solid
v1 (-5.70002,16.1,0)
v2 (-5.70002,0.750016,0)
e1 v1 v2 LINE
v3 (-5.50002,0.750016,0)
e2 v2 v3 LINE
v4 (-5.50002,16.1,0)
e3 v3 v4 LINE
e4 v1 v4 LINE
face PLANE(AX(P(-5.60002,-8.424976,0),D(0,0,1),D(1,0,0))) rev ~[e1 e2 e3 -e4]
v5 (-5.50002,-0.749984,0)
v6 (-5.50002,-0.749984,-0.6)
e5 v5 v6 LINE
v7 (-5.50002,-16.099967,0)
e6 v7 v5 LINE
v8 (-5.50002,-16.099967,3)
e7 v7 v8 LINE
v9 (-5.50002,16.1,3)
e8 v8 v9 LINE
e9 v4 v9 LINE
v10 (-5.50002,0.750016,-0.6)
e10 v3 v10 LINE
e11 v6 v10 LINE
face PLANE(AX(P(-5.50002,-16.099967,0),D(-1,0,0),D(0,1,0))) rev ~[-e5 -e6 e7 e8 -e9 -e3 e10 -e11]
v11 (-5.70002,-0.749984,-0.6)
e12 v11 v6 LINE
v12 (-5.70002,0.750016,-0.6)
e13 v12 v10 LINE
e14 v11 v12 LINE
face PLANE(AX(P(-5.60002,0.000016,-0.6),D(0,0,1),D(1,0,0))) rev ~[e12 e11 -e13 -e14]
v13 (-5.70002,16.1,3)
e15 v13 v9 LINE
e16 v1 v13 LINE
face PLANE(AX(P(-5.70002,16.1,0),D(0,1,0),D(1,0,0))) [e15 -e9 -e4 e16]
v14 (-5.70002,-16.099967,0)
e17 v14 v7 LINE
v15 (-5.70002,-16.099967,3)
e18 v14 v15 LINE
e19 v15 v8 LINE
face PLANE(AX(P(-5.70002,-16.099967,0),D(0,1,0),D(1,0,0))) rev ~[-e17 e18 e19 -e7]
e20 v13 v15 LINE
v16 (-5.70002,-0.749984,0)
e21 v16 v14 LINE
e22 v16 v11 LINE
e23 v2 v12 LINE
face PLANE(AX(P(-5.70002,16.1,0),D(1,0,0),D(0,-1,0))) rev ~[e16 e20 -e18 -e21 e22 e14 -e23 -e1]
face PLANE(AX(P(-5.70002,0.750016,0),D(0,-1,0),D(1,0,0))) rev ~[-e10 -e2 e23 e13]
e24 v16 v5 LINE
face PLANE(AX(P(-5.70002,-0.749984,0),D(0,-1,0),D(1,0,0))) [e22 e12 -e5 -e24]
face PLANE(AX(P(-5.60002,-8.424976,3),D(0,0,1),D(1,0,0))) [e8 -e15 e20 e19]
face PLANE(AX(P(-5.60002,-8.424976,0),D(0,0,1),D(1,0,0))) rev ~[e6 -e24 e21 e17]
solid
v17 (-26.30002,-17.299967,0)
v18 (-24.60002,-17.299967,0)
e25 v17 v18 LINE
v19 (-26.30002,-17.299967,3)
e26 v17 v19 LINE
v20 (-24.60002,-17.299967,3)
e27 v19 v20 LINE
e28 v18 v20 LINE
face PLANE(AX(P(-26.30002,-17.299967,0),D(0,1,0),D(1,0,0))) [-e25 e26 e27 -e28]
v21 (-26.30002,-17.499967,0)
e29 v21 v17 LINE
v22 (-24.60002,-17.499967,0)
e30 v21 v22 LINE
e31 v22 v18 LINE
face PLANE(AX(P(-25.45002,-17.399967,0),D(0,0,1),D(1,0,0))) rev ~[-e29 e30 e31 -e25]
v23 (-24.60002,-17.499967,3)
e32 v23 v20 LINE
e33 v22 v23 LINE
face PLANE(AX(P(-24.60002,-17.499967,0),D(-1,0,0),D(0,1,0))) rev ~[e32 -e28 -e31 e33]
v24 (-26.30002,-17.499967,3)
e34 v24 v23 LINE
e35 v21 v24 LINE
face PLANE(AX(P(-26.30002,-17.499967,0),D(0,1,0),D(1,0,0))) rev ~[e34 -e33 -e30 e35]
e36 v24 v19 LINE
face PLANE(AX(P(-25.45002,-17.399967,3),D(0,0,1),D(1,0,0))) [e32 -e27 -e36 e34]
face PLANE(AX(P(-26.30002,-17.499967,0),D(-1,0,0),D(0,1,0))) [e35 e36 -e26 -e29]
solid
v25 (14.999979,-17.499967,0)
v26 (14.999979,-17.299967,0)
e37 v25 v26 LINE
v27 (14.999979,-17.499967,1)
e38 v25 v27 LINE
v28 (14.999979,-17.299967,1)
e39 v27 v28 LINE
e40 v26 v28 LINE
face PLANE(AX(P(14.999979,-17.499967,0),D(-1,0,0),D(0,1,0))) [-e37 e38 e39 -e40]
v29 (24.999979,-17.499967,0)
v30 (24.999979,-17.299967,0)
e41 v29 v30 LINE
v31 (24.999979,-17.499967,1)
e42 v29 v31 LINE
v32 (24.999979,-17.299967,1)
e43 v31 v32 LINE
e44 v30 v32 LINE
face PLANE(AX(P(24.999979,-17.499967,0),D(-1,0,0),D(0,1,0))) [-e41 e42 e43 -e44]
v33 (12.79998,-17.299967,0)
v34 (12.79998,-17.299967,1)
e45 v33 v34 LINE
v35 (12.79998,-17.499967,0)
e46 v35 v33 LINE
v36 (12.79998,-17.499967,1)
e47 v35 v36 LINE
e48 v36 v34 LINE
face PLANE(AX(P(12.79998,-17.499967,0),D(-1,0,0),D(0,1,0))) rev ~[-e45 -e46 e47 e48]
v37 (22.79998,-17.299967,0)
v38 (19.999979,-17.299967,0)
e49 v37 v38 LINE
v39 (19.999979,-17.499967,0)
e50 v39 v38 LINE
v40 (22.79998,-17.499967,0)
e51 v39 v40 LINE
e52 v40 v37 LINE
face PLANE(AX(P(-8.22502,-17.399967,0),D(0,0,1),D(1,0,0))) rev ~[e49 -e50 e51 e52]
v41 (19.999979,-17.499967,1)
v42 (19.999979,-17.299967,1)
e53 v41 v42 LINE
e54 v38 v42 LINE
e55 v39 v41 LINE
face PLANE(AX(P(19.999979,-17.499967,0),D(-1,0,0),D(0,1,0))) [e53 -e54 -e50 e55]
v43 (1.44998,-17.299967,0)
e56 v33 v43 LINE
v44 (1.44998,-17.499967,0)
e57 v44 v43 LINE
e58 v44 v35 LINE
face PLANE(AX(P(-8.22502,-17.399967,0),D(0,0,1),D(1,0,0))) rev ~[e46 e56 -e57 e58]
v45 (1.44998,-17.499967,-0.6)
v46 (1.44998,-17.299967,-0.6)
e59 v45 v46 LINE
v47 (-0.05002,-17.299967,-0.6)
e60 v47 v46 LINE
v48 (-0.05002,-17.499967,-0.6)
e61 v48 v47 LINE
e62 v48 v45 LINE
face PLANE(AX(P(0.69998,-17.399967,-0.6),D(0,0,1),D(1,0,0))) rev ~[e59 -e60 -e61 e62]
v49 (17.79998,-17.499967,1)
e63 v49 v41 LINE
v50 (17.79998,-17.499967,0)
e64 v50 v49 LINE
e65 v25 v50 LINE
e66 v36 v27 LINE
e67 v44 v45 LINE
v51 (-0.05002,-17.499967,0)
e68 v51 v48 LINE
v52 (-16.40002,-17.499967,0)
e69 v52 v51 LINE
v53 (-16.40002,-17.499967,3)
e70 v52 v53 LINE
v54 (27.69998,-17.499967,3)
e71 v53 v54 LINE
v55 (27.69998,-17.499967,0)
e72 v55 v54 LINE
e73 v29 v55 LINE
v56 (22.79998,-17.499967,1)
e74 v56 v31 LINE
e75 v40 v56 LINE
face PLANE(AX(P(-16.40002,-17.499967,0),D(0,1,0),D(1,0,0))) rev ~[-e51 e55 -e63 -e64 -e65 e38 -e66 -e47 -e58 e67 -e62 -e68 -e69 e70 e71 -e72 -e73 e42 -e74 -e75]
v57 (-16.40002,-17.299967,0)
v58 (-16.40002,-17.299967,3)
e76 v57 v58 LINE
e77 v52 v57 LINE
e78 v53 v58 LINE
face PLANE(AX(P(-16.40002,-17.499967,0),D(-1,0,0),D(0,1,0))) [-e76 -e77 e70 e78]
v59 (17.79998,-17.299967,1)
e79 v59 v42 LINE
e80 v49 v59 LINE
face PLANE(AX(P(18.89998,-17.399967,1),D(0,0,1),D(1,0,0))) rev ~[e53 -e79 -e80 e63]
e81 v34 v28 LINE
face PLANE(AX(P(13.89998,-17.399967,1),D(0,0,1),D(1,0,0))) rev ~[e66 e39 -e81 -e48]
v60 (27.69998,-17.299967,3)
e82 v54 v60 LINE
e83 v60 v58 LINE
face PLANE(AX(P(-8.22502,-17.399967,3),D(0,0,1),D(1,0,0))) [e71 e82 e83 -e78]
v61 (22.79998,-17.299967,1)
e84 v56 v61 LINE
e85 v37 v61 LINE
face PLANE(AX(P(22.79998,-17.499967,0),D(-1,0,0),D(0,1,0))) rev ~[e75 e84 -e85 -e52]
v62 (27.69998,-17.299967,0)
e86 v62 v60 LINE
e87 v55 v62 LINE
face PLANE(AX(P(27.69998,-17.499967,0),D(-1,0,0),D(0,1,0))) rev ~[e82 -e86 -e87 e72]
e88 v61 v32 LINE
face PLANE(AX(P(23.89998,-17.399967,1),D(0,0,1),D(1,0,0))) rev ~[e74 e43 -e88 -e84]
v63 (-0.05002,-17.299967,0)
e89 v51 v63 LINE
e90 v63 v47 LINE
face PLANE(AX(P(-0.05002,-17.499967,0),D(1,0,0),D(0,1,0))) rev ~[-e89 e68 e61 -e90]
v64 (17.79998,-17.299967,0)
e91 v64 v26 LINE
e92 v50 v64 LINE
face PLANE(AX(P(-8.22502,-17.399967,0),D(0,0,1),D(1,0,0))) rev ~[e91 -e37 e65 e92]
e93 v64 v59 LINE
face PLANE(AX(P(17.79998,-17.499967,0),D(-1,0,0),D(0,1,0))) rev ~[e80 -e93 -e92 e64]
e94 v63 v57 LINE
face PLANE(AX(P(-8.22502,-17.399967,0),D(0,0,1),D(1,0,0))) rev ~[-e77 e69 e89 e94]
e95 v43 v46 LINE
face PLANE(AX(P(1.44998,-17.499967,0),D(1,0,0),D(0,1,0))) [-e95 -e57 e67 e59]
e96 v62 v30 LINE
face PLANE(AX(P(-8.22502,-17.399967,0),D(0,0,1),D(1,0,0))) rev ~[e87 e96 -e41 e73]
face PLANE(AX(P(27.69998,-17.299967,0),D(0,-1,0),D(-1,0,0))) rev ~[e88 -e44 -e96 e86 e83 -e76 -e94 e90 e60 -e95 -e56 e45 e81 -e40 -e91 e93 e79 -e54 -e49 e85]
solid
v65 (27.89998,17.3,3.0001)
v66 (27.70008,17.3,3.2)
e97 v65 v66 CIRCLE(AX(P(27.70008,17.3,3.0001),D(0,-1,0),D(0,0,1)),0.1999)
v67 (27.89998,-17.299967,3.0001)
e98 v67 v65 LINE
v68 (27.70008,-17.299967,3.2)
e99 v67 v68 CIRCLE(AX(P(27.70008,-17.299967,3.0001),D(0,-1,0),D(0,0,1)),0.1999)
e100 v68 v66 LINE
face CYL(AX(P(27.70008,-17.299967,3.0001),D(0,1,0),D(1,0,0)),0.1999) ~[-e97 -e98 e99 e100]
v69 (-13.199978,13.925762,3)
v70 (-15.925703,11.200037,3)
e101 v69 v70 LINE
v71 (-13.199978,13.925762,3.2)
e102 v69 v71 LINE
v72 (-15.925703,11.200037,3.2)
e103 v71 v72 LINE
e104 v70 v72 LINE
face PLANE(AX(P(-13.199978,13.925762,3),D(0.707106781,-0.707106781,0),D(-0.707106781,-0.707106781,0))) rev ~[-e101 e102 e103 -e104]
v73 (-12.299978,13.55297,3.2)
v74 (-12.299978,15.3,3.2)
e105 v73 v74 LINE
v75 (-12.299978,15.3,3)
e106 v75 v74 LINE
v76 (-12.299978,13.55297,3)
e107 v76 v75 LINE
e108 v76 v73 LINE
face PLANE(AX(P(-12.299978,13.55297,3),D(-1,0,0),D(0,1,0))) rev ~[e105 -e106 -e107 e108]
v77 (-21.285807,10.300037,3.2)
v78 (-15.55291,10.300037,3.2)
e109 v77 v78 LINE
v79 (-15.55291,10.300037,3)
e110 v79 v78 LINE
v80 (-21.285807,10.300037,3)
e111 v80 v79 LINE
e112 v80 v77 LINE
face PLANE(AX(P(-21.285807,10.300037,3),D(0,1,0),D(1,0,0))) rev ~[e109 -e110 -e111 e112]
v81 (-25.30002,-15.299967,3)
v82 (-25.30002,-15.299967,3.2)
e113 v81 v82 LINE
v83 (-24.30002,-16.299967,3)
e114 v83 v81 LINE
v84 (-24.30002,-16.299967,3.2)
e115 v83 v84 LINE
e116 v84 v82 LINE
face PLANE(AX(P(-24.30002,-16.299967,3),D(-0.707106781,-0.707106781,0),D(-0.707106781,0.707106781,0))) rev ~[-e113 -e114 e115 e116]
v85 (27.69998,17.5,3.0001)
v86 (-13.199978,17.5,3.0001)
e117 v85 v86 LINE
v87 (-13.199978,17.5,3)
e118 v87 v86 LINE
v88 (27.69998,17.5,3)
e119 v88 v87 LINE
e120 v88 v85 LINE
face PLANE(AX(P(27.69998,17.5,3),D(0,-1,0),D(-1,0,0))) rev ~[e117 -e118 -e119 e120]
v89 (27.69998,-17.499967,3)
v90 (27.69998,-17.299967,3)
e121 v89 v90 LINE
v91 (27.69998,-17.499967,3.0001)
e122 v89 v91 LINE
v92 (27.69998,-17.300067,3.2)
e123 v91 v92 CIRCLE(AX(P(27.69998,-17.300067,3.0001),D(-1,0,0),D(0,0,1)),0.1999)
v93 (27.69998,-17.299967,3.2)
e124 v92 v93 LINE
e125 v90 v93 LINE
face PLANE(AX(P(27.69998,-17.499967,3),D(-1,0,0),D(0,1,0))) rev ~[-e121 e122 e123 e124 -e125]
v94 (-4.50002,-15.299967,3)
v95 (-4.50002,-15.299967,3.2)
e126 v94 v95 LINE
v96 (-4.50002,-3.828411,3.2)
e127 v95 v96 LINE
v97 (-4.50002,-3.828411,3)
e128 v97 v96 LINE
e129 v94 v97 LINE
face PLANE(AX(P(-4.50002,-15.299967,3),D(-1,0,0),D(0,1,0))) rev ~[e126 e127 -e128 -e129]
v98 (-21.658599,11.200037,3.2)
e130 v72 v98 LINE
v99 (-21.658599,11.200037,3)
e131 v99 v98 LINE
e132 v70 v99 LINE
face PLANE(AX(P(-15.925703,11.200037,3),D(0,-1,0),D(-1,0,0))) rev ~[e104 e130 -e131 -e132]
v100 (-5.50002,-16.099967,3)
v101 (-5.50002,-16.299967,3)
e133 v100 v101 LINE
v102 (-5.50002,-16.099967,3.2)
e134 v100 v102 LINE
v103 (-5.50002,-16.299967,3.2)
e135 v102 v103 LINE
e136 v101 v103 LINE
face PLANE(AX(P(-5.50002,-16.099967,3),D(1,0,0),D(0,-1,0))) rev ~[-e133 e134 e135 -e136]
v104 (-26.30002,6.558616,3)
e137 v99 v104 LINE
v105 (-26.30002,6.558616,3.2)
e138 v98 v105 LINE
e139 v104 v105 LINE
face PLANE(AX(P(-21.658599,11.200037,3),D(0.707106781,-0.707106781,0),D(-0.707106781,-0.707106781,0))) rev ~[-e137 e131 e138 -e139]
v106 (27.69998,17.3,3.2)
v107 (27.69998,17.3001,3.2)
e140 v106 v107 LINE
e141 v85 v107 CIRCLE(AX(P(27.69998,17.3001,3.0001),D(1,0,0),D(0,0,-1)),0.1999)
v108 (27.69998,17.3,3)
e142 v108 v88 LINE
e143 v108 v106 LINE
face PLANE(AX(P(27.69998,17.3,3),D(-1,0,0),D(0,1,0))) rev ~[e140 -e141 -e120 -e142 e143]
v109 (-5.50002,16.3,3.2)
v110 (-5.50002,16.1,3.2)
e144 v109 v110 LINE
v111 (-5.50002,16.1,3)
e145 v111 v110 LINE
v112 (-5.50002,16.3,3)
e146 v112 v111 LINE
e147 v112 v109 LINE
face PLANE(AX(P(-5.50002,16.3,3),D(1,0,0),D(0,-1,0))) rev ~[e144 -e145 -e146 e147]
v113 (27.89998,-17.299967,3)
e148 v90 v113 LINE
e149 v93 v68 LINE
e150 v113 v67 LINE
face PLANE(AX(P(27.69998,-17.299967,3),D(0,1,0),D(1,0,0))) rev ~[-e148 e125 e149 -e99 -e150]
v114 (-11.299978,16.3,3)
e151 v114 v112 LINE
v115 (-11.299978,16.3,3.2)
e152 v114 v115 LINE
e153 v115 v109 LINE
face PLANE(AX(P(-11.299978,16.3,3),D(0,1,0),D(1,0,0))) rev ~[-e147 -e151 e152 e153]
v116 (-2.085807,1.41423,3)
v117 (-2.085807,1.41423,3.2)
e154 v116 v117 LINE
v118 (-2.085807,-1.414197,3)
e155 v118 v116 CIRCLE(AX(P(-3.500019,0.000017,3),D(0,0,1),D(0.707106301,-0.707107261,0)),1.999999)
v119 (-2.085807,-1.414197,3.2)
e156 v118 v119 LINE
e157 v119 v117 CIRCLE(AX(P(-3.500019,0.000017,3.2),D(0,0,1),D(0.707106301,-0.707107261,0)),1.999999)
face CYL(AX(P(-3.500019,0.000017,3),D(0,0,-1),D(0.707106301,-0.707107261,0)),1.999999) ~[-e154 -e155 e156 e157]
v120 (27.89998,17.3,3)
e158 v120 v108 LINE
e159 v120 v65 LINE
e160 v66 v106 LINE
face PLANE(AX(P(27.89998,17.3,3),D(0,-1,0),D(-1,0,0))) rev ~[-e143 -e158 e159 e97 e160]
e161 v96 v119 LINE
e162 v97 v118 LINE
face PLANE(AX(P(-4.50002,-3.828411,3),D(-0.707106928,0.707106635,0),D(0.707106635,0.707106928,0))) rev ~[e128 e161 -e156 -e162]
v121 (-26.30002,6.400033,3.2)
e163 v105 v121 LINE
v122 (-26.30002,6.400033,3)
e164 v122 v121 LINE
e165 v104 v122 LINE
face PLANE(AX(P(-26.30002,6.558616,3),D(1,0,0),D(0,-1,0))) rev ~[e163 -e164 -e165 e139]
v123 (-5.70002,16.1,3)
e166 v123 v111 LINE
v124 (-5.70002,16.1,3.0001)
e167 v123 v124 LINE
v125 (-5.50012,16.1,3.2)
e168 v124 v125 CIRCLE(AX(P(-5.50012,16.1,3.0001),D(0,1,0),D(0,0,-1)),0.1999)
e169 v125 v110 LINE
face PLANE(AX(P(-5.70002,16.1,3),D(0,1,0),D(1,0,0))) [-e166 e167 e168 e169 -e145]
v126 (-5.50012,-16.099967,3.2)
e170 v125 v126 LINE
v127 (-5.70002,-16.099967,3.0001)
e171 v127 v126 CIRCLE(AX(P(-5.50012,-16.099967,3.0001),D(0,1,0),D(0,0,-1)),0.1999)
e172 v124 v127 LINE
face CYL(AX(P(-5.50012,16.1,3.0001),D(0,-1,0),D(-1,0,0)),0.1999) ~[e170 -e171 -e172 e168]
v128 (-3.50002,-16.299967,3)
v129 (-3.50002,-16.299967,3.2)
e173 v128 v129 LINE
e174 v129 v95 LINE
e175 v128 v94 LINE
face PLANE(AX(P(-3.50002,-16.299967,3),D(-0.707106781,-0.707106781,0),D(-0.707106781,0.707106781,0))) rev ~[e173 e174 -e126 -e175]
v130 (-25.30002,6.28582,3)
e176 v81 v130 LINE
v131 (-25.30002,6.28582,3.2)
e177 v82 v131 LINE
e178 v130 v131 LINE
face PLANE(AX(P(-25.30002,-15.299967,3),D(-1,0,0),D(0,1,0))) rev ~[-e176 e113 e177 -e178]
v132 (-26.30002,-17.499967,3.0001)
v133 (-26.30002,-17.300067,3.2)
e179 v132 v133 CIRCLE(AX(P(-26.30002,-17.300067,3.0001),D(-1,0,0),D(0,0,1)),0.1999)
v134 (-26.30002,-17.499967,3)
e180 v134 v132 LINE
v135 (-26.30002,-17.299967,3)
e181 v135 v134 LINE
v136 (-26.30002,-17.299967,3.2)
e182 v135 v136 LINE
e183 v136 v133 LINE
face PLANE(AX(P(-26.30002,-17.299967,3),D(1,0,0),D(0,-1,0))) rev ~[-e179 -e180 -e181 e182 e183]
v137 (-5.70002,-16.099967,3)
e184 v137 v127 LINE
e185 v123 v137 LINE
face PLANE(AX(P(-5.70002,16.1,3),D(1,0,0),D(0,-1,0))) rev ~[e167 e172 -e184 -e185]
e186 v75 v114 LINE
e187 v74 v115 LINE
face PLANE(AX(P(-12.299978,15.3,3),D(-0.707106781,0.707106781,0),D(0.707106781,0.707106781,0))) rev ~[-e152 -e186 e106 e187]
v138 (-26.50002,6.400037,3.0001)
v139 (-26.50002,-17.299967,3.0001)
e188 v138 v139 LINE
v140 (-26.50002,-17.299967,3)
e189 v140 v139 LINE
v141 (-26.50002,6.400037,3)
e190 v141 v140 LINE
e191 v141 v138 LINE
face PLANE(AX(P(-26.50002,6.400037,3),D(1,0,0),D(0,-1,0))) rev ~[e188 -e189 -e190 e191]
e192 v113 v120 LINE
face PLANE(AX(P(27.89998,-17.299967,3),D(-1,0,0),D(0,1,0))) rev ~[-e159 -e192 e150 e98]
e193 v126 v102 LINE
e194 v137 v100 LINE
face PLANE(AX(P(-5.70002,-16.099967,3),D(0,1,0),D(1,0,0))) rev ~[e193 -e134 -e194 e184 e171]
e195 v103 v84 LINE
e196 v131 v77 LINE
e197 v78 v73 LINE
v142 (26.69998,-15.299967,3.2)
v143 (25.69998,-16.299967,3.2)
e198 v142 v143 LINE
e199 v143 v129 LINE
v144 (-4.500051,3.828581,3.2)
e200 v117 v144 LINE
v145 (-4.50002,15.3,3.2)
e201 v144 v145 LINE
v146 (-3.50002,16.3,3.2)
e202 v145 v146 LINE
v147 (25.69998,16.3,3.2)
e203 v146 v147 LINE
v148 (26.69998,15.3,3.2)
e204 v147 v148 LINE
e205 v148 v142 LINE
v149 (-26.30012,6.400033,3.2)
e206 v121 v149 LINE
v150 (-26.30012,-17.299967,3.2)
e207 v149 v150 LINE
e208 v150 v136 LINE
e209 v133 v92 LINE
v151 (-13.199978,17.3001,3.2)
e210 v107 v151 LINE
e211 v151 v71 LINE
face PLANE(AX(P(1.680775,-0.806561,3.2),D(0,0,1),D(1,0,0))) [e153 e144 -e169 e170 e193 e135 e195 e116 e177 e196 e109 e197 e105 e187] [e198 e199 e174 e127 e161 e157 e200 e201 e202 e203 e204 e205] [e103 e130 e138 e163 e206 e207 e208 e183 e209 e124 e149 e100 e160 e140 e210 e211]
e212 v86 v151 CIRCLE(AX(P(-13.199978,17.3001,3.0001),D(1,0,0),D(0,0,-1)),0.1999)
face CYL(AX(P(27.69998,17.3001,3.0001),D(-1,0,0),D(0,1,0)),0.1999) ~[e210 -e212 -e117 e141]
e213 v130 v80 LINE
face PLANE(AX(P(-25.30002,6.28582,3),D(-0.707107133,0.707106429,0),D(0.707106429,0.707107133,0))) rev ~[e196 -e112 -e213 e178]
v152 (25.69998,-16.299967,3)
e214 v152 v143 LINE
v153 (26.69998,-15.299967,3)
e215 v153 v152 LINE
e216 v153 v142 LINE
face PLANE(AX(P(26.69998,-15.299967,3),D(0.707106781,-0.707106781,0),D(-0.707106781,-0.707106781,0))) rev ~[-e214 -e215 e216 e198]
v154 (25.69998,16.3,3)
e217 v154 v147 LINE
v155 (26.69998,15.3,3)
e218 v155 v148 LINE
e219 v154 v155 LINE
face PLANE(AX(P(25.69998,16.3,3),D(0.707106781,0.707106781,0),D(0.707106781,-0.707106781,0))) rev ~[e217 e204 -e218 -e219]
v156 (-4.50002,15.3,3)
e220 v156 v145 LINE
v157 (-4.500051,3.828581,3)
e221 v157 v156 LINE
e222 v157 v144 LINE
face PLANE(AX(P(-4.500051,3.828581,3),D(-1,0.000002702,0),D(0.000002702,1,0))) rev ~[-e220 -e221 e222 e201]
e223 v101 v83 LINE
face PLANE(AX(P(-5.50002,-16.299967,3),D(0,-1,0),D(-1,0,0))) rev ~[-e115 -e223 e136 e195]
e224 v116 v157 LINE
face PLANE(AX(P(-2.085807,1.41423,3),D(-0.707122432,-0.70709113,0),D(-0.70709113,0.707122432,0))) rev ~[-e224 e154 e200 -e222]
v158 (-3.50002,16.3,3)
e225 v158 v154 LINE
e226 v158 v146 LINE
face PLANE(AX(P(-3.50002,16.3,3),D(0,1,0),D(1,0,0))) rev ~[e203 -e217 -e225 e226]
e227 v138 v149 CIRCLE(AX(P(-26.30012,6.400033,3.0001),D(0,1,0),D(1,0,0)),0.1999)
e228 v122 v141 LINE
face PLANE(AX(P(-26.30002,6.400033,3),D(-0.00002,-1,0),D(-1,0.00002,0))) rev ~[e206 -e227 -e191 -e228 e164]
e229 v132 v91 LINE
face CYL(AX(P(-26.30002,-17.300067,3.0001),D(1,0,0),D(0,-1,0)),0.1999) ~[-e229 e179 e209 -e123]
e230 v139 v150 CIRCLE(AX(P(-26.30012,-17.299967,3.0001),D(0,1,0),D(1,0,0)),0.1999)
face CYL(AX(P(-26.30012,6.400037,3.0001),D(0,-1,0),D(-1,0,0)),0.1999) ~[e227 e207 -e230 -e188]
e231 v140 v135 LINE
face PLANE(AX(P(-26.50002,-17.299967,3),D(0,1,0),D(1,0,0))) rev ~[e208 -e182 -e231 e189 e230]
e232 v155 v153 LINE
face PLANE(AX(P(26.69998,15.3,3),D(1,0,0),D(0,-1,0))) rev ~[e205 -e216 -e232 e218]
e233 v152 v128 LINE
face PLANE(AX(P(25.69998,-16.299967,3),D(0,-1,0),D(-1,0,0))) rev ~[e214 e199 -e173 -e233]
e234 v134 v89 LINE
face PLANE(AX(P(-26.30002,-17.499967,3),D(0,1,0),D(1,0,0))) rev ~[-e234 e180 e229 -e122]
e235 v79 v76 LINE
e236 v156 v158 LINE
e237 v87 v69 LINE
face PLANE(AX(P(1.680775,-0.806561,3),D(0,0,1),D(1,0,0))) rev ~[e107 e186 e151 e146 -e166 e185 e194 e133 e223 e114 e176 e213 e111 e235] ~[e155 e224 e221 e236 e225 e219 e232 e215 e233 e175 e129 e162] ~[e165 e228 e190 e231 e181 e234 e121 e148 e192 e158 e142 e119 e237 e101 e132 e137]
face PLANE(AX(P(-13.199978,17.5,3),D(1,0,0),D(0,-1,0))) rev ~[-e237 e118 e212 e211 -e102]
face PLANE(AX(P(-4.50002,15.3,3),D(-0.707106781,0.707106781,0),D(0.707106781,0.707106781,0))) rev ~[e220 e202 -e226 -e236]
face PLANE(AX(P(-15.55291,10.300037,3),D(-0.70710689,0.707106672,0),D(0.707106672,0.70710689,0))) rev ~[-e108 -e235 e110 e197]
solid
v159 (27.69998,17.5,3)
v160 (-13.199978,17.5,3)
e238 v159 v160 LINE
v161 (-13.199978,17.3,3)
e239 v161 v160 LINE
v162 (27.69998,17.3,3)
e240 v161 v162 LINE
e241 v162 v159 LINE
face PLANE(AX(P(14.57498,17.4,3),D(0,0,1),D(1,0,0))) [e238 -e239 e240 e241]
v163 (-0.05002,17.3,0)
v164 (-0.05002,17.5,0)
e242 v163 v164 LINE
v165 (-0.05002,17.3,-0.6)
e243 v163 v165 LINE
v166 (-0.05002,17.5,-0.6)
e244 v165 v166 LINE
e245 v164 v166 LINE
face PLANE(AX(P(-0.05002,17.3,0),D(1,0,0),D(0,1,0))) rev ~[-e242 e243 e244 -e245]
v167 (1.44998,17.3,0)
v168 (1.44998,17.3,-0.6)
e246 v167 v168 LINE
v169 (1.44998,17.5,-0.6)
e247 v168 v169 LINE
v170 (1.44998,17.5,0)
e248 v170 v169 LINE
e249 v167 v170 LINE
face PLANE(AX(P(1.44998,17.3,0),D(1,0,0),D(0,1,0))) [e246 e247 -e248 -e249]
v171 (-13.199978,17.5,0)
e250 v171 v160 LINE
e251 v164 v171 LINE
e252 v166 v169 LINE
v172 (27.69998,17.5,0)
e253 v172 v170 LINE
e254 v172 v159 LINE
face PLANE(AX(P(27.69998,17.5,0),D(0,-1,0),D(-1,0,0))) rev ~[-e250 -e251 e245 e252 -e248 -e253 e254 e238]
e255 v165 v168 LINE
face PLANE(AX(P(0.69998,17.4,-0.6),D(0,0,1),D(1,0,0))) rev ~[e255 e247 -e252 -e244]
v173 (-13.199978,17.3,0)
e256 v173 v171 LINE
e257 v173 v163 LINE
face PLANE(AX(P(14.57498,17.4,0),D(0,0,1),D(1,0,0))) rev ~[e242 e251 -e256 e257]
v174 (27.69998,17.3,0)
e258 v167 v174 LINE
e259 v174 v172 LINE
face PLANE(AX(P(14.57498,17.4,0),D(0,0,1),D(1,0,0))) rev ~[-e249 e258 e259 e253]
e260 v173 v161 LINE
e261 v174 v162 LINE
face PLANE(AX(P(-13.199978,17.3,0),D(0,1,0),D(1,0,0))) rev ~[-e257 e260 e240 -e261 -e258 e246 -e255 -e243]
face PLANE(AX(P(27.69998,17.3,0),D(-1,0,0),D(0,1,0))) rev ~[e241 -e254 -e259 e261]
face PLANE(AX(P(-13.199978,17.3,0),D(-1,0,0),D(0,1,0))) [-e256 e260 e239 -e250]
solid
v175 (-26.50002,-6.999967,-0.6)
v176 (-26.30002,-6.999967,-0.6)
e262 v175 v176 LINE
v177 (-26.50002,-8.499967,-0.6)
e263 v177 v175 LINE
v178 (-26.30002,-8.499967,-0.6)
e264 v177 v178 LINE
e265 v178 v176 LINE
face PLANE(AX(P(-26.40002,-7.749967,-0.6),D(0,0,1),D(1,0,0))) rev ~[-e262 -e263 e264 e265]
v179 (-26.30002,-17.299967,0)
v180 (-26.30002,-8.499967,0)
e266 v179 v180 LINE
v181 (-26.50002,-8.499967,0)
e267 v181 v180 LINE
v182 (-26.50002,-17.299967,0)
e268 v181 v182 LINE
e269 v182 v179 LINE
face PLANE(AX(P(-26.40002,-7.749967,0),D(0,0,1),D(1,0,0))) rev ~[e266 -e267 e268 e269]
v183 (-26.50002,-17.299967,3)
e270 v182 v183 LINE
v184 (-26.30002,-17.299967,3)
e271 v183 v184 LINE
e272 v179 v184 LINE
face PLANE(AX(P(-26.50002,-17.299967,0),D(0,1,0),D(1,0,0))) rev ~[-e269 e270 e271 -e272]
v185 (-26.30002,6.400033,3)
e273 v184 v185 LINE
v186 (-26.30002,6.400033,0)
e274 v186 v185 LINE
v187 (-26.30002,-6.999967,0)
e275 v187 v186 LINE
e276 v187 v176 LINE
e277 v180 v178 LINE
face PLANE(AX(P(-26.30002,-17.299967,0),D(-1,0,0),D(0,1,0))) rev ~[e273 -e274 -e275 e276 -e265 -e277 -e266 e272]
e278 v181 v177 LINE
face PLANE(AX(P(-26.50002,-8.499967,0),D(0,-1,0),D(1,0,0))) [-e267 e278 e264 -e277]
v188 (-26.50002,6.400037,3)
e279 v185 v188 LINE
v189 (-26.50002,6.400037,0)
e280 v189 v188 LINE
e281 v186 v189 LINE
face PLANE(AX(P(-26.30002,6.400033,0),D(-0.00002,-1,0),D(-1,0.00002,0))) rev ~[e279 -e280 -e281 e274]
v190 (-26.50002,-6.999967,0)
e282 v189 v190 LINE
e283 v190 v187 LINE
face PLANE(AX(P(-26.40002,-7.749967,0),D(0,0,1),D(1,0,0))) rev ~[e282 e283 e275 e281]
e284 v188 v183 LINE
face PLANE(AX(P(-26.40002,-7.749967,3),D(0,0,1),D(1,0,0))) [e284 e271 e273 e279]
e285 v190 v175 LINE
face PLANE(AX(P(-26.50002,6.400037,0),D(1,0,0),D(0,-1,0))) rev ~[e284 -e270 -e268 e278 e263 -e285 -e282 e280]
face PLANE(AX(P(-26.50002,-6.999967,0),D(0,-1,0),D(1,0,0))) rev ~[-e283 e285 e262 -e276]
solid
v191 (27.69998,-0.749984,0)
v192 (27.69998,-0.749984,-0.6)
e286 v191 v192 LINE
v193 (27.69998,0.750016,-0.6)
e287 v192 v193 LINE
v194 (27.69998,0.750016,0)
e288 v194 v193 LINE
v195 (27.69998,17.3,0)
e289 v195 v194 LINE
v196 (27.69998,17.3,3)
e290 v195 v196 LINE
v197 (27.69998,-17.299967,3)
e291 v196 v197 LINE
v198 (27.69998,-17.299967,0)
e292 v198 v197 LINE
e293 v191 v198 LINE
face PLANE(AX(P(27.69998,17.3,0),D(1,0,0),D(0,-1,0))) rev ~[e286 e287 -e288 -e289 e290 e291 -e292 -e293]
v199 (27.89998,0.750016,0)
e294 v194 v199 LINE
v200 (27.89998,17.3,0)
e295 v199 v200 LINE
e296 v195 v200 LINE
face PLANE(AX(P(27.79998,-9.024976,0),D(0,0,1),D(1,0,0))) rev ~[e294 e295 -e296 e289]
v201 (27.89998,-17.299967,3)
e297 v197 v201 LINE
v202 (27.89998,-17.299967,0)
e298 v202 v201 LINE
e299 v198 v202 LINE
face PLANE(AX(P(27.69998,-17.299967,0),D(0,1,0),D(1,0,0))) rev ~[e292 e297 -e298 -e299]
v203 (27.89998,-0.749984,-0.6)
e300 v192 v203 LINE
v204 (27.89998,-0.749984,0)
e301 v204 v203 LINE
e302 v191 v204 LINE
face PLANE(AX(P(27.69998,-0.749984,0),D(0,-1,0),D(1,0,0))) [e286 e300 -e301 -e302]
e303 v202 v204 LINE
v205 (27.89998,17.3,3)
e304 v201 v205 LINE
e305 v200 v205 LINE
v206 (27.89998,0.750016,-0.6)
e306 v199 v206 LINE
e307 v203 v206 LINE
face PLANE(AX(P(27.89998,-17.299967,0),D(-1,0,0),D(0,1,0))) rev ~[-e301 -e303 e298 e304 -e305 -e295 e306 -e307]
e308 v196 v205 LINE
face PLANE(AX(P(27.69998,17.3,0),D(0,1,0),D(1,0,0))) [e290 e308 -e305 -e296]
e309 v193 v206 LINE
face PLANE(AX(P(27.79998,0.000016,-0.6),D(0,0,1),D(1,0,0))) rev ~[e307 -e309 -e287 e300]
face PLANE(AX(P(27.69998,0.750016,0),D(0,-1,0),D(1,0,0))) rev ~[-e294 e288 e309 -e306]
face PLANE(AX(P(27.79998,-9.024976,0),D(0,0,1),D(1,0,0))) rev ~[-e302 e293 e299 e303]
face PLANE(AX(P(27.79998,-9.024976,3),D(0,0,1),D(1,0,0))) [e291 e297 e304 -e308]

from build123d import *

# Parameters (mm, degrees)
F0_W     = 0.2
F0_H     = 1.5
F0_H_2   = 8.8
F1_DEPTH = 3
F0_W_2   = 1.7
F0_H_3   = 0.2
F0_W_3   = 16.35
F0_W_4   = 1.5
F0_W_5   = 11.35
F0_W_6   = 2.199999
F0_W_7   = 2.800001
F0_W_8   = 2.700001
F0_H_4   = 15.349983
F0_H_5   = 15.349984
F0_H_6   = 16.549983
F0_H_7   = 16.549984
F0_W_9   = 26.25
F0_W_10  = 13.149958
F2_START = 3
F2_DEPTH = 0.2
F3_DEPTH = 1
F4_DEPTH = 0.6
F5_R     = 0.1999


# Not quite as in the source:
# - a fillet or chamfer is up to 0.001 mm smaller than in the source, because OpenCascade refuses the exact size
# - ends of sketch curves that miss each other by under 0.0002 mm in the source are joined


with BuildPart() as f1:
    # F0 (on Top) → F1 (new body)
    with BuildSketch(Plane.XY):
        with Locations((-26.40002, -7.749967)):
            Rectangle(F0_W, F0_H)
        Polygon((-26.30002, 6.400033), (-26.50002, 6.400037), (-26.50002, -6.999967), (-26.30002, -6.999967), align=None)
        with Locations((-26.40002, -12.899967)):
            Rectangle(F0_W, F0_H_2)
    extrude(amount=F1_DEPTH)

    # F0 (on Top) → F4, piece 3 (join)
    with BuildSketch(Plane.XY):
        with Locations((-26.40002, -7.749967)):
            Rectangle(F0_W, F0_H)
    extrude(amount=-F4_DEPTH)


with BuildPart() as f1b:
    # F0 (on Top) → F1, piece 2 (new body)
    with BuildSketch(Plane.XY):
        with Locations((-25.45002, -17.399967)):
            Rectangle(F0_W_2, F0_H_3)
    extrude(amount=F1_DEPTH)


with BuildPart() as f1c:
    # F0 (on Top) → F1, piece 3 (new body)
    with BuildSketch(Plane.XY):
        with Locations((-8.22502, -17.399967)):
            Rectangle(F0_W_3, F0_H_3)
        with Locations((0.69998, -17.399967)):
            Rectangle(F0_W_4, F0_H_3)
        with Locations((7.12498, -17.399967)):
            Rectangle(F0_W_5, F0_H_3)
        with Locations((13.8999795, -17.399967)):
            Rectangle(F0_W_6, F0_H_3)
        with Locations((16.3999795, -17.399967)):
            Rectangle(F0_W_7, F0_H_3)
        with Locations((18.8999795, -17.399967)):
            Rectangle(F0_W_6, F0_H_3)
        with Locations((21.3999795, -17.399967)):
            Rectangle(F0_W_7, F0_H_3)
        with Locations((23.8999795, -17.399967)):
            Rectangle(F0_W_6, F0_H_3)
        with Locations((26.3499795, -17.399967)):
            Rectangle(F0_W_8, F0_H_3)
    extrude(amount=F1_DEPTH)

    # F0 (on Top) → F3 (cut)
    with BuildSketch(Plane.XY):
        with Locations((13.8999795, -17.399967)):
            Rectangle(F0_W_6, F0_H_3)
        with Locations((18.8999795, -17.399967)):
            Rectangle(F0_W_6, F0_H_3)
        with Locations((23.8999795, -17.399967)):
            Rectangle(F0_W_6, F0_H_3)
    extrude(amount=F3_DEPTH, mode=Mode.SUBTRACT)

    # F0 (on Top) → F4 (join)
    with BuildSketch(Plane.XY):
        with Locations((0.69998, -17.399967)):
            Rectangle(F0_W_4, F0_H_3)
    extrude(amount=-F4_DEPTH)


with BuildPart() as f1d:
    # F0 (on Top) → F1, piece 4 (new body)
    with BuildSketch(Plane.XY):
        with Locations((-5.60002, -8.4249755)):
            Rectangle(F0_W, F0_H_4)
        with Locations((-5.60002, 1.6e-05)):
            Rectangle(F0_W, F0_H)
        with Locations((-5.60002, 8.425008)):
            Rectangle(F0_W, F0_H_5)
    extrude(amount=F1_DEPTH)

    # F0 (on Top) → F4, piece 2 (join)
    with BuildSketch(Plane.XY):
        with Locations((-5.60002, 1.6e-05)):
            Rectangle(F0_W, F0_H)
    extrude(amount=-F4_DEPTH)


with BuildPart() as f1e:
    # F0 (on Top) → F1, piece 5 (new body)
    with BuildSketch(Plane.XY):
        with Locations((27.79998, -9.0249755)):
            Rectangle(F0_W, F0_H_6)
        with Locations((27.79998, 1.6e-05)):
            Rectangle(F0_W, F0_H)
        with Locations((27.79998, 9.025008)):
            Rectangle(F0_W, F0_H_7)
    extrude(amount=F1_DEPTH)

    # F0 (on Top) → F4, piece 5 (join)
    with BuildSketch(Plane.XY):
        with Locations((27.79998, 1.6e-05)):
            Rectangle(F0_W, F0_H)
    extrude(amount=-F4_DEPTH)


with BuildPart() as f1f:
    # F0 (on Top) → F1, piece 6 (new body)
    with BuildSketch(Plane.XY):
        with Locations((14.57498, 17.4)):
            Rectangle(F0_W_9, F0_H_3)
        with Locations((0.69998, 17.4)):
            Rectangle(F0_W_4, F0_H_3)
        with Locations((-6.624999, 17.4)):
            Rectangle(F0_W_10, F0_H_3)
    extrude(amount=F1_DEPTH)

    # F0 (on Top) → F4, piece 4 (join)
    with BuildSketch(Plane.XY):
        with Locations((0.69998, 17.4)):
            Rectangle(F0_W_4, F0_H_3)
    extrude(amount=-F4_DEPTH)


with BuildPart() as f2:
    # F0 (on Top) → F2 (new body)
    with BuildSketch(Plane.XY.offset(F2_START)):
        Polygon((-26.30002, 6.500037), (-26.30002, 6.400033), (-26.30002, -6.999967), (-26.30002, -8.499967), (-26.30002, -17.299967), (-24.60002, -17.299967), (-24.60002, -17.499967), (-16.40002, -17.499967), (-16.40002, -17.299967), (-0.05002, -17.299967), (1.44998, -17.299967), (12.79998, -17.299967), (14.999979, -17.299967), (17.79998, -17.299967), (19.999979, -17.299967), (22.79998, -17.299967), (24.999979, -17.299967), (27.69998, -17.299967), (27.69998, -0.749984), (27.69998, 0.750016), (27.69998, 17.3), (1.44998, 17.3), (-0.05002, 17.3), (-13.199978, 17.3), (-13.199978, 13.925762), (-15.925703, 11.200037), (-21.658599, 11.200037), (-26.30002, 6.558616), align=None)
        Polygon((-25.30002, -15.299967), (-25.30002, 6.28582), (-21.285807, 10.300037), (-15.55291, 10.300037), (-12.299978, 13.55297), (-12.299978, 15.3), (-11.299978, 16.3), (-5.50002, 16.3), (-5.50002, 16.1), (-5.50002, 0.750016), (-5.50002, -0.749984), (-5.50002, -16.099967), (-5.50002, -16.299967), (-24.30002, -16.299967), align=None, mode=Mode.SUBTRACT)
        with BuildLine():
            Line((25.69998, 16.3), (26.69998, 15.3))
            Line((26.69998, 15.3), (26.69998, -15.299967))
            Line((26.69998, -15.299967), (25.69998, -16.299967))
            Line((25.69998, -16.299967), (-3.50002, -16.299967))
            Line((-3.50002, -16.299967), (-4.50002, -15.299967))
            Line((-4.50002, -15.299967), (-4.50002, -3.828411))
            Line((-4.50002, -3.828411), (-2.085807, -1.414197))
            ThreePointArc((-2.085807, -1.414197), (-1.50002, 1.63536e-05), (-2.0858069376, 1.4142300624))
            Line((-2.0858069376, 1.4142300624), (-4.500051, 3.828581))
            Line((-4.500051, 3.828581), (-4.50002, 15.3))
            Line((-4.50002, 15.3), (-3.50002, 16.3))
            Line((-3.50002, 16.3), (25.69998, 16.3))
        make_face(mode=Mode.SUBTRACT)
        with Locations((-25.45002, -17.399967)):
            Rectangle(F0_W_2, F0_H_3)
        with Locations((-26.40002, -12.899967)):
            Rectangle(F0_W, F0_H_2)
        with Locations((-26.40002, -7.749967)):
            Rectangle(F0_W, F0_H)
        Polygon((-26.30002, 6.400033), (-26.50002, 6.400037), (-26.50002, -6.999967), (-26.30002, -6.999967), align=None)
        with Locations((-6.624999, 17.4)):
            Rectangle(F0_W_10, F0_H_3)
        with Locations((-5.60002, 8.425008)):
            Rectangle(F0_W, F0_H_5)
        with Locations((-5.60002, 1.6e-05)):
            Rectangle(F0_W, F0_H)
        with Locations((-5.60002, -8.4249755)):
            Rectangle(F0_W, F0_H_4)
        with Locations((-8.22502, -17.399967)):
            Rectangle(F0_W_3, F0_H_3)
        with Locations((0.69998, -17.399967)):
            Rectangle(F0_W_4, F0_H_3)
        with Locations((7.12498, -17.399967)):
            Rectangle(F0_W_5, F0_H_3)
        with Locations((13.8999795, -17.399967)):
            Rectangle(F0_W_6, F0_H_3)
        with Locations((16.3999795, -17.399967)):
            Rectangle(F0_W_7, F0_H_3)
        with Locations((18.8999795, -17.399967)):
            Rectangle(F0_W_6, F0_H_3)
        with Locations((21.3999795, -17.399967)):
            Rectangle(F0_W_7, F0_H_3)
        with Locations((23.8999795, -17.399967)):
            Rectangle(F0_W_6, F0_H_3)
        with Locations((26.3499795, -17.399967)):
            Rectangle(F0_W_8, F0_H_3)
        with Locations((27.79998, -9.0249755)):
            Rectangle(F0_W, F0_H_6)
        with Locations((27.79998, 1.6e-05)):
            Rectangle(F0_W, F0_H)
        with Locations((27.79998, 9.025008)):
            Rectangle(F0_W, F0_H_7)
        with Locations((14.57498, 17.4)):
            Rectangle(F0_W_9, F0_H_3)
        with Locations((0.69998, 17.4)):
            Rectangle(F0_W_4, F0_H_3)
    extrude(amount=F2_DEPTH)

    # F5 (radius 0.2 in the source; OpenCascade refuses exactly that, so slightly less here)
    f5_edges = [f2.edges().sort_by_distance(p)[0] for p in [
        (0.69998, -17.499967, 3.2),
        (27.89998, 1.7e-05, 3.2),
        (7.250001, 17.5, 3.2),
        (-26.50002, -5.449965, 3.2),
        (-5.70002, 1.7e-05, 3.2),
    ]]
    fillet(f5_edges, radius=F5_R)


solid = Compound([f1.part, f1b.part, f1c.part, f1d.part, f1e.part, f1f.part, f2.part])
